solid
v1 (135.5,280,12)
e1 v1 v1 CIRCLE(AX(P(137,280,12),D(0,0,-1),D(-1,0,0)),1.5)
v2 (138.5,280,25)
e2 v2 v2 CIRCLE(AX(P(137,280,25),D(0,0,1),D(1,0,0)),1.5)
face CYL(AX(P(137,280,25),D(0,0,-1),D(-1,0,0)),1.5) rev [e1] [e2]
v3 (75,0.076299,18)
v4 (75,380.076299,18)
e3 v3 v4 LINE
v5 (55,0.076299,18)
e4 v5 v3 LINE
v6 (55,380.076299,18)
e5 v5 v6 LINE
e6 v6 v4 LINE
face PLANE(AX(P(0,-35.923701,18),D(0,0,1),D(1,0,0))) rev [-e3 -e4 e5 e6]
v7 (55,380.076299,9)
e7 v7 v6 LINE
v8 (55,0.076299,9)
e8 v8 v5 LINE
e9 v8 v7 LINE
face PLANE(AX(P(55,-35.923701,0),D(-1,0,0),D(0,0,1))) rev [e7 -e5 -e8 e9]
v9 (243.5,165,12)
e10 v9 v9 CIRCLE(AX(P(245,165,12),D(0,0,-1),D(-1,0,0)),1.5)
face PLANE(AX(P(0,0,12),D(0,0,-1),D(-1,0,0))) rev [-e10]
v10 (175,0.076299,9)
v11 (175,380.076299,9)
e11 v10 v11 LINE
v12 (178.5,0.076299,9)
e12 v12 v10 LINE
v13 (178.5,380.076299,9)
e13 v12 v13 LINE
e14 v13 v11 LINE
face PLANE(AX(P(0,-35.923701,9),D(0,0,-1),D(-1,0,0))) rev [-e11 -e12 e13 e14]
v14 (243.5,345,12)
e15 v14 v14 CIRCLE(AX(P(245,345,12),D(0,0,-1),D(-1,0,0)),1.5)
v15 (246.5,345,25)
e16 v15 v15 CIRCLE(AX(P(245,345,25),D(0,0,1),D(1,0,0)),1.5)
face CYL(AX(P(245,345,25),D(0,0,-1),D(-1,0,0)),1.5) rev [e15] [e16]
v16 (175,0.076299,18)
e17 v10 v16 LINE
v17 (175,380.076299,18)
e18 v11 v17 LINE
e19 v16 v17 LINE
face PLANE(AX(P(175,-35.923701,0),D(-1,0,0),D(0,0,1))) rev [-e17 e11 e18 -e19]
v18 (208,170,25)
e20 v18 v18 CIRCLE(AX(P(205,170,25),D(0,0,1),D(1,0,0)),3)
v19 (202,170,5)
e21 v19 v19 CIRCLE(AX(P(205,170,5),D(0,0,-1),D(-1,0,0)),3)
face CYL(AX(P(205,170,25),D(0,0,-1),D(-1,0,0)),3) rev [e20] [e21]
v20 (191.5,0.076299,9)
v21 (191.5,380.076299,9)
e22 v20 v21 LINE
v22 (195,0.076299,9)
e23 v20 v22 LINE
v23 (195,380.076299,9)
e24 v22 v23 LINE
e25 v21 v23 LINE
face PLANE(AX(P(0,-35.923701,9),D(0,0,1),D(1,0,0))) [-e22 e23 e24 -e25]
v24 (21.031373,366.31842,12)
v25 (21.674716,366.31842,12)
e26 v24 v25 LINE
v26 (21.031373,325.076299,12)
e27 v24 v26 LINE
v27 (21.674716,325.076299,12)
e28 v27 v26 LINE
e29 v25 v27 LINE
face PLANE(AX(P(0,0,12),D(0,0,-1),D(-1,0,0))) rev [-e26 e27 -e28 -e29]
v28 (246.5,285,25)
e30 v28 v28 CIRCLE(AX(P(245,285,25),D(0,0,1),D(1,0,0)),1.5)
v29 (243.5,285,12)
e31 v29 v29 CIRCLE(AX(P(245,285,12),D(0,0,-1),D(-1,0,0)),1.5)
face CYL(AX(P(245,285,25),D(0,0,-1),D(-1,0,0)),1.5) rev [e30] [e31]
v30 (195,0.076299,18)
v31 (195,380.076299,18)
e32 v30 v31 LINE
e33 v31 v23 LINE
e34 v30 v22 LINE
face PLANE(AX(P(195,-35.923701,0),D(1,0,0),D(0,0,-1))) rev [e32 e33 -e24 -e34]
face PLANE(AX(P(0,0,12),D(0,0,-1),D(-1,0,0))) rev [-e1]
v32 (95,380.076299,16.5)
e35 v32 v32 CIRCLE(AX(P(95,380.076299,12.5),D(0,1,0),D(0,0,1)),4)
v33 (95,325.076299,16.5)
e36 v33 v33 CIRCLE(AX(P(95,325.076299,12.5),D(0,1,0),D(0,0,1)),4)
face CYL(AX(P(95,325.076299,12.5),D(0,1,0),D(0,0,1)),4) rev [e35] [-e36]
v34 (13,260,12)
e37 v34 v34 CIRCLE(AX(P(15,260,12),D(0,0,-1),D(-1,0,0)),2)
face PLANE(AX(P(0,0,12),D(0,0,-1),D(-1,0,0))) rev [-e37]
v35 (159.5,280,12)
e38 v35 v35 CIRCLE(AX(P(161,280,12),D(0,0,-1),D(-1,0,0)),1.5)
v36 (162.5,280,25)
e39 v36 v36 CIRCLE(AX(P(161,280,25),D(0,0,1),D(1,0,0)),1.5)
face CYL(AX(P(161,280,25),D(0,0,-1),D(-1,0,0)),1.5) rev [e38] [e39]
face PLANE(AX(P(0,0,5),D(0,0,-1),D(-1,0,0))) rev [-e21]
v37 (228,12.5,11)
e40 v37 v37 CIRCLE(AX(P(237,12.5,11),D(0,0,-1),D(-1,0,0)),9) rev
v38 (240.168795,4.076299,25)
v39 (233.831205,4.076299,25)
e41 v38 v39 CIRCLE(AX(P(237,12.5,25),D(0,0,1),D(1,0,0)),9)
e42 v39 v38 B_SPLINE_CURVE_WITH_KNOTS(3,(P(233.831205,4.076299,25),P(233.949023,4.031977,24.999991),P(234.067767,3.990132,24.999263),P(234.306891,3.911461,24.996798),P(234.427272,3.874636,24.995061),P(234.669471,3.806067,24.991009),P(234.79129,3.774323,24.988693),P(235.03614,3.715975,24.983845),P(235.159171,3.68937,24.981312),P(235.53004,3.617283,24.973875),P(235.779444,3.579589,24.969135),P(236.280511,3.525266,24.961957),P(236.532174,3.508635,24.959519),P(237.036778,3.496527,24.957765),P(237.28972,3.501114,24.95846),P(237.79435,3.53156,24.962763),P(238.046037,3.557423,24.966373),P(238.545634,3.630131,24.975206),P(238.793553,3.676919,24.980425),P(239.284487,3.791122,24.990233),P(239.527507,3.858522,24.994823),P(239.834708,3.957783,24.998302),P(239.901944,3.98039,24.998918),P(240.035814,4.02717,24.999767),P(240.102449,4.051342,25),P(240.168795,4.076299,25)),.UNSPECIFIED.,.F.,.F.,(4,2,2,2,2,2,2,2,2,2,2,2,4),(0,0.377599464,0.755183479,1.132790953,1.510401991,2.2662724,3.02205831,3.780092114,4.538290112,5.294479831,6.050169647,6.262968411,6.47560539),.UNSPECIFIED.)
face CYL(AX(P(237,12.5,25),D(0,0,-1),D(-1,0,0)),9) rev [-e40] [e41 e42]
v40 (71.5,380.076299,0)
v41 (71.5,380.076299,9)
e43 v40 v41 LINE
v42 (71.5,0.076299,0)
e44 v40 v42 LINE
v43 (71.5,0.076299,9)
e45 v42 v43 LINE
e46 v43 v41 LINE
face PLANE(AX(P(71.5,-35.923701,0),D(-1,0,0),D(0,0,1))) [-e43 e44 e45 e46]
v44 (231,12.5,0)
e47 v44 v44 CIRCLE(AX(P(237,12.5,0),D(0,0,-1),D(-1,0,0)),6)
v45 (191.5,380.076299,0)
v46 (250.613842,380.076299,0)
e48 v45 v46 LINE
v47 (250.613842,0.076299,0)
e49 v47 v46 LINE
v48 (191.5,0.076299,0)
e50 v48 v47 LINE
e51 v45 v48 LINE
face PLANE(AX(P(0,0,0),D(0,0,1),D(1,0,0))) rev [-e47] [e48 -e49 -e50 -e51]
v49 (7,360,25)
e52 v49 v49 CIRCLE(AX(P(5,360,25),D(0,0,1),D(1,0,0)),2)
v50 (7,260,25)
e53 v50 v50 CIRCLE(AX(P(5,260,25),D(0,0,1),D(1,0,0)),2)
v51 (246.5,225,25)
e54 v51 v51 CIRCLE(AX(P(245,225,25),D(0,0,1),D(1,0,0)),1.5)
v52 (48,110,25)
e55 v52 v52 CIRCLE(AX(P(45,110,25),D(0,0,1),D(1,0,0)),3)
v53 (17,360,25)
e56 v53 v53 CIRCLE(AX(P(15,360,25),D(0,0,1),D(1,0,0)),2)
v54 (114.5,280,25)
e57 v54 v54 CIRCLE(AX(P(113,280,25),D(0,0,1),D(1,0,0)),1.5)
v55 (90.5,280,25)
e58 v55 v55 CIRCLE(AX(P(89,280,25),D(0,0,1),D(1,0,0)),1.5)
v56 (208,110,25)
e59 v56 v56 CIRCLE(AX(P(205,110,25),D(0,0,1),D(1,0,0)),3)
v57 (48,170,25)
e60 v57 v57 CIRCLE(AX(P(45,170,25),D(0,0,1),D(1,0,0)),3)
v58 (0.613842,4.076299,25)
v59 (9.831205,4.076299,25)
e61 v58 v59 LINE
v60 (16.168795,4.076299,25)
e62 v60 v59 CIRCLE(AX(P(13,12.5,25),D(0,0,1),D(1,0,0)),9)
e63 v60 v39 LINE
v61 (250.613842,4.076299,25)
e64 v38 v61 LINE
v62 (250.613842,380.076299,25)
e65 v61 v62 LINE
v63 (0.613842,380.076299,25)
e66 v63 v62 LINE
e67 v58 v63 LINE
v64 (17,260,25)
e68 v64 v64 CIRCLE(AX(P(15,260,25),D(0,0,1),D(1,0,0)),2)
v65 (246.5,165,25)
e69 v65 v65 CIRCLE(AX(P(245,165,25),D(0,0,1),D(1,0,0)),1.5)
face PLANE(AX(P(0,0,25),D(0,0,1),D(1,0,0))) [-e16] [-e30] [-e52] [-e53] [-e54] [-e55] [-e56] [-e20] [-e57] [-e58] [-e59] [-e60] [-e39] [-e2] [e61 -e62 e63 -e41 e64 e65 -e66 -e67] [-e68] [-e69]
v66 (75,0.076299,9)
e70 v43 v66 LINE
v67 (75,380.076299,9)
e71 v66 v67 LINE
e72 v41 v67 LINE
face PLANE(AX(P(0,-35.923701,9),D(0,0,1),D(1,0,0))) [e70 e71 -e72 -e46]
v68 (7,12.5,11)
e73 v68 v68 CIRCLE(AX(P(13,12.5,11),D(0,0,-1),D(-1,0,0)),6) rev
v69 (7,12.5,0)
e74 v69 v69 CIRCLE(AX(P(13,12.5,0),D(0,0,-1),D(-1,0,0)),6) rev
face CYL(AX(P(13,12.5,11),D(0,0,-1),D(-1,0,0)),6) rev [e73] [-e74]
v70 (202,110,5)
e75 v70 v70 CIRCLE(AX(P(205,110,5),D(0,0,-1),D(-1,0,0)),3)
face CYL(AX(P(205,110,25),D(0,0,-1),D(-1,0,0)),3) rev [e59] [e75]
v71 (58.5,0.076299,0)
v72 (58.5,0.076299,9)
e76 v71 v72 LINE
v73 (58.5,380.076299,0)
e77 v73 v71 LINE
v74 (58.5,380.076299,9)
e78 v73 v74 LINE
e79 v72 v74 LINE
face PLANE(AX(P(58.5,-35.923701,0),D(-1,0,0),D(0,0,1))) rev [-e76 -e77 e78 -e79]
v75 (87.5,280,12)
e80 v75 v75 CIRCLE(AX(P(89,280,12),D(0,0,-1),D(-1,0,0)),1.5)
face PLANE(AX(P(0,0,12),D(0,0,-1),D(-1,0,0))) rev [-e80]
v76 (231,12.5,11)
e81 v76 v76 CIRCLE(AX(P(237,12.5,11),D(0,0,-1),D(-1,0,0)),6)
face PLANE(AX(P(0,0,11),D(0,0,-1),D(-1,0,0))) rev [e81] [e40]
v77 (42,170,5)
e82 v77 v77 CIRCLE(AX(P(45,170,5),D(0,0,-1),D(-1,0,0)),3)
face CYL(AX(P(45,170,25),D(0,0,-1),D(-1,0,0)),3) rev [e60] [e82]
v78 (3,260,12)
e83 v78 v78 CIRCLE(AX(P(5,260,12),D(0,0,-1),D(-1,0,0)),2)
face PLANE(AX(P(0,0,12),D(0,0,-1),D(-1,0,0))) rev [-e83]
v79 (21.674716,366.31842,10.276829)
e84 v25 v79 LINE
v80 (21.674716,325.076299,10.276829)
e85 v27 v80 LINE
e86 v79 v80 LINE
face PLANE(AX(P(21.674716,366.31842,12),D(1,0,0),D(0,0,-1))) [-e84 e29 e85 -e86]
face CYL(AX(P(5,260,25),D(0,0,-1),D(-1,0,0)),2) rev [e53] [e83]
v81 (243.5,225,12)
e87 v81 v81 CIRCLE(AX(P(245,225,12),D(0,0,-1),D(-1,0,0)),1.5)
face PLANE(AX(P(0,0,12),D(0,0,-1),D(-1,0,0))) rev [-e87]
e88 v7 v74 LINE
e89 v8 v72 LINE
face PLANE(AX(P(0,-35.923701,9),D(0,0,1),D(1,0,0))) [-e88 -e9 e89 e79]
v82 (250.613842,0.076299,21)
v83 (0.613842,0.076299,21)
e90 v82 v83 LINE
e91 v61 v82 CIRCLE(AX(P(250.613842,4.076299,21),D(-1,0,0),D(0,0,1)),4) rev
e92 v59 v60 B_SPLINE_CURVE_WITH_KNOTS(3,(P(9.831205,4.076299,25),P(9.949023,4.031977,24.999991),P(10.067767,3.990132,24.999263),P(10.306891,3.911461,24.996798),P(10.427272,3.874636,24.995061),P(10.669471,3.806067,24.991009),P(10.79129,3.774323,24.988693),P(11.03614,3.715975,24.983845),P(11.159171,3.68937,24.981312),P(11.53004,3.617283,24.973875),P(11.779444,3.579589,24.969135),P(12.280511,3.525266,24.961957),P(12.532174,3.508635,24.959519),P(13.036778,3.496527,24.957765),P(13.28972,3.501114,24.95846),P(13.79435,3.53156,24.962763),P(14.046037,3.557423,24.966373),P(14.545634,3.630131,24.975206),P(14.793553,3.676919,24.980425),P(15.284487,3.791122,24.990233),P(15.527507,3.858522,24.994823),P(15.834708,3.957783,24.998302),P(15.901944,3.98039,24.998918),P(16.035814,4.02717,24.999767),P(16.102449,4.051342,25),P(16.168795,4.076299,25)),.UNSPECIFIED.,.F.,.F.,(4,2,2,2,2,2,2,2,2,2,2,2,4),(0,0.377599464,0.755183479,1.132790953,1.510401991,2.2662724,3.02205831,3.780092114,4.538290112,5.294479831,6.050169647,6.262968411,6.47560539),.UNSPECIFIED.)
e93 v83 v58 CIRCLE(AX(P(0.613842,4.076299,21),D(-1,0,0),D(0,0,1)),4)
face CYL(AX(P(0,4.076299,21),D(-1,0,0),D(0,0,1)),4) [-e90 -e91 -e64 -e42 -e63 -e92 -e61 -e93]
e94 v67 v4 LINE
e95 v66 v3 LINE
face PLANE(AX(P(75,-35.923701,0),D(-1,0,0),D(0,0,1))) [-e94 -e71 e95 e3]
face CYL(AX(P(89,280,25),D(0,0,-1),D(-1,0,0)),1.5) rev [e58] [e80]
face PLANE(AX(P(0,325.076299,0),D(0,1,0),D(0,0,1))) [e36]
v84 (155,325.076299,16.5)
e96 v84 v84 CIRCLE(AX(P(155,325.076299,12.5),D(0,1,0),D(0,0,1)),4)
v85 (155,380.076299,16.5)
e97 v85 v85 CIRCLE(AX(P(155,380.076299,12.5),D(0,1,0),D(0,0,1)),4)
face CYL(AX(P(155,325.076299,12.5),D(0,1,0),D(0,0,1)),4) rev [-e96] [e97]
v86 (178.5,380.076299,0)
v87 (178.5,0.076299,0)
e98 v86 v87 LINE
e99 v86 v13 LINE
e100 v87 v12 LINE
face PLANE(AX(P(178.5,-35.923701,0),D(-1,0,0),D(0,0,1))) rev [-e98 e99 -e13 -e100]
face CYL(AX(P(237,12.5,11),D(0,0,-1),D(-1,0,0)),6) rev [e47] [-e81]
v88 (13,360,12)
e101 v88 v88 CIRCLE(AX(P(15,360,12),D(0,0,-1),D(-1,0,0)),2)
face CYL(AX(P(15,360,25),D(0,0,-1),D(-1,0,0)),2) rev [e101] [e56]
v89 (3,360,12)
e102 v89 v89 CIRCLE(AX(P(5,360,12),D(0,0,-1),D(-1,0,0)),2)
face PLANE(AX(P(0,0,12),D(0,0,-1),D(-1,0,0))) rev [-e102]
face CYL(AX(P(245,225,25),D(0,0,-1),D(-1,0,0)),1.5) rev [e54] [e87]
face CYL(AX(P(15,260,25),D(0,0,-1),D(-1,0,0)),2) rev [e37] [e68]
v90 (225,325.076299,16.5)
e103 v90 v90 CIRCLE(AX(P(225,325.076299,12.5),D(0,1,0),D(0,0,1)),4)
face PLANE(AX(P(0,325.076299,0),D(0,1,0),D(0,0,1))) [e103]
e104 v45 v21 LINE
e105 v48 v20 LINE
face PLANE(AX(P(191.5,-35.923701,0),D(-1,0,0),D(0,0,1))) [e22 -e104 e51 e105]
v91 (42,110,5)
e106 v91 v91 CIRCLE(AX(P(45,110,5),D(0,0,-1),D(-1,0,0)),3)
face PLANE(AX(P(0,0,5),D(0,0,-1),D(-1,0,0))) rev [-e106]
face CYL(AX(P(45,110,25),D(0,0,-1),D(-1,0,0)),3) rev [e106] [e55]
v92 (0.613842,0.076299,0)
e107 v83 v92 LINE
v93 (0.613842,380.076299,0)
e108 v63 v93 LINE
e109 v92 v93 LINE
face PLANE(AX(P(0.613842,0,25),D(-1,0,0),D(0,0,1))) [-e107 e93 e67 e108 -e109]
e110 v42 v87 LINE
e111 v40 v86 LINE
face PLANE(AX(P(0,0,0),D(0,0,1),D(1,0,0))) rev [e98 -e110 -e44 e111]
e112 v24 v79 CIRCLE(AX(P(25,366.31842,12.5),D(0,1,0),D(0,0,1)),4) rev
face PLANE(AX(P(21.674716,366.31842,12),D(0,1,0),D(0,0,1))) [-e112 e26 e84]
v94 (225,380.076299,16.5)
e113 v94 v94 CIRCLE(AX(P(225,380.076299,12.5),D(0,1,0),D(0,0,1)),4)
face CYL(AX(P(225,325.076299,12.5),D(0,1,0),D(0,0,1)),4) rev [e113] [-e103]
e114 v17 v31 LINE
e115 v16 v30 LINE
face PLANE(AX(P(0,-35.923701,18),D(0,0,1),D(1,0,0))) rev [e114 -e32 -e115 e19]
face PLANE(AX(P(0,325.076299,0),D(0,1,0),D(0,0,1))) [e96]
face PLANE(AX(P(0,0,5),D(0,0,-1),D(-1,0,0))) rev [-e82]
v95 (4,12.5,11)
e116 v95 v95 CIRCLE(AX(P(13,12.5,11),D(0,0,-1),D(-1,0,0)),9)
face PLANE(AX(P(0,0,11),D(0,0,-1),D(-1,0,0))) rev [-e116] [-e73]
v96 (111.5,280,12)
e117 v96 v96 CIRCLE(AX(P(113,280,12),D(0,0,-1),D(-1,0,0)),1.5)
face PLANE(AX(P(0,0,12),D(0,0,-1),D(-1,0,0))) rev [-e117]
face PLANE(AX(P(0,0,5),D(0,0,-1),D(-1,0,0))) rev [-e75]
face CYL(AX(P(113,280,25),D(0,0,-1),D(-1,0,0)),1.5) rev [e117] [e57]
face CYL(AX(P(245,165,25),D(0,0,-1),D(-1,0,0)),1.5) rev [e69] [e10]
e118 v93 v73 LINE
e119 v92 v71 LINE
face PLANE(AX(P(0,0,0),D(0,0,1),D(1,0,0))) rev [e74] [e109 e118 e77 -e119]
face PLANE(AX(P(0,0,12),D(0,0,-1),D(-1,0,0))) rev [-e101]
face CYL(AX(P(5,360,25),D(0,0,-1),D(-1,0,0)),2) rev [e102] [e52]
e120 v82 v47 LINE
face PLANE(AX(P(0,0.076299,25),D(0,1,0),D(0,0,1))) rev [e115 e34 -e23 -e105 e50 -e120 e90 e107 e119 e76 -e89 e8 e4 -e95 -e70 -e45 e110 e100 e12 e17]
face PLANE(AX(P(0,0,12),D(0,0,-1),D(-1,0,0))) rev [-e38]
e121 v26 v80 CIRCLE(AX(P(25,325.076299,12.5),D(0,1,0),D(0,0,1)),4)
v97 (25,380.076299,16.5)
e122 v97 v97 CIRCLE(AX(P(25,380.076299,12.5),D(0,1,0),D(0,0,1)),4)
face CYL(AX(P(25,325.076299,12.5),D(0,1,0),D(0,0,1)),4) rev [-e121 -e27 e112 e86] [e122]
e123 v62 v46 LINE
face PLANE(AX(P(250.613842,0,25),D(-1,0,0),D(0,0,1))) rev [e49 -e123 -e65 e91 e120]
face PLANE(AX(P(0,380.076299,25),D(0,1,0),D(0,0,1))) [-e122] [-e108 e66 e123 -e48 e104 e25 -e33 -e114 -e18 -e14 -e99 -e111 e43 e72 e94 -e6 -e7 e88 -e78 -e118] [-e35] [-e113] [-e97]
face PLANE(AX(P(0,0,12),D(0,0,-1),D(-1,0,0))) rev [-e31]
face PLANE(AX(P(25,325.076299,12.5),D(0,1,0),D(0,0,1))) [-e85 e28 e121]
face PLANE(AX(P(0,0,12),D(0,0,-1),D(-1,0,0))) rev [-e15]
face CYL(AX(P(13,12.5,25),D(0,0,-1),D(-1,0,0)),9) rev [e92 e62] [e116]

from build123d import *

# Parameters (mm, degrees)
SKETCH_1_W          = 250
SKETCH_1_H          = 380
SKETCH_1_R          = 9
SKETCH_1_R_2        = 2
SKETCH_1_R_3        = 1.5
SKETCH_1_R_4        = 3
EXTRUDE_3_DEPTH     = 25
CUT_EXTRUDE_1_DEPTH = 416
SKETCH_3_4_R        = 4
CUT_EXTRUDE_2_DEPTH = 55
SKETCH_5_W          = 76.418543054
SKETCH_5_H          = 18.162254628
EXTRUDE_4_DEPTH     = 12
SKETCH_6_W          = 9.937837438
SKETCH_6_H          = 197.728696601
EXTRUDE_5_DEPTH     = 12
SKETCH_7_W          = 21.060874429
SKETCH_7_H          = 111.734651623
EXTRUDE_6_DEPTH     = 12
SKETCH_8_W          = 15.76346628
SKETCH_8_H          = 76.418543054
EXTRUDE_7_DEPTH     = 5
SKETCH_9_W          = 10.965889587
SKETCH_9_H          = 75.390490905
EXTRUDE_8_DEPTH     = 5
SKETCH_10_W         = 21.30480461
SKETCH_10_H         = 26.996927979
SKETCH_10_R         = 6
EXTRUDE_11_DEPTH    = 11
FILLET_1_R          = 4


with BuildPart() as part:
    # 草图1 → 凸台-拉伸3 (new body)
    with BuildSketch(Plane.XY):
        with Locations((125.613842041, 190.076299127)):
            Rectangle(SKETCH_1_W, SKETCH_1_H)
        with Locations((13, 12.5)):
            Circle(SKETCH_1_R, mode=Mode.SUBTRACT)
        with Locations((237, 12.5)):
            Circle(SKETCH_1_R, mode=Mode.SUBTRACT)
        with Locations((5, 360)):
            Circle(SKETCH_1_R_2, mode=Mode.SUBTRACT)
        with Locations((5, 260)):
            Circle(SKETCH_1_R_2, mode=Mode.SUBTRACT)
        with Locations((15, 360)):
            Circle(SKETCH_1_R_2, mode=Mode.SUBTRACT)
        with Locations((15, 260)):
            Circle(SKETCH_1_R_2, mode=Mode.SUBTRACT)
        with Locations((89, 280)):
            Circle(SKETCH_1_R_3, mode=Mode.SUBTRACT)
        with Locations((113, 280)):
            Circle(SKETCH_1_R_3, mode=Mode.SUBTRACT)
        with Locations((137, 280)):
            Circle(SKETCH_1_R_3, mode=Mode.SUBTRACT)
        with Locations((161, 280)):
            Circle(SKETCH_1_R_3, mode=Mode.SUBTRACT)
        with Locations((45, 110)):
            Circle(SKETCH_1_R_4, mode=Mode.SUBTRACT)
        with Locations((45, 170)):
            Circle(SKETCH_1_R_4, mode=Mode.SUBTRACT)
        with Locations((205, 170)):
            Circle(SKETCH_1_R_4, mode=Mode.SUBTRACT)
        with Locations((205, 110)):
            Circle(SKETCH_1_R_4, mode=Mode.SUBTRACT)
        with Locations((245, 345)):
            Circle(SKETCH_1_R_3, mode=Mode.SUBTRACT)
        with Locations((245, 285)):
            Circle(SKETCH_1_R_3, mode=Mode.SUBTRACT)
        with Locations((245, 225)):
            Circle(SKETCH_1_R_3, mode=Mode.SUBTRACT)
        with Locations((245, 165)):
            Circle(SKETCH_1_R_3, mode=Mode.SUBTRACT)
    extrude(amount=EXTRUDE_3_DEPTH)

    # 草图3 → 切除-拉伸1 (cut)
    with BuildSketch(Plane(origin=(0, 380.076299127, 0), x_dir=(1, 0, 0), z_dir=(0, 1, 0))):
        Polygon((71.5, -9), (71.5, 0), (58.5, 0), (58.5, -9), (55, -9), (55, -18), (75, -18), (75, -9), align=None)
        Polygon((191.5, 0), (178.5, 0), (178.5, -9), (175, -9), (175, -18), (195, -18), (195, -9), (191.5, -9), align=None)
    extrude(amount=-CUT_EXTRUDE_1_DEPTH, mode=Mode.SUBTRACT)

    # 草图3<4> → 切除-拉伸2 (cut)
    with BuildSketch(Plane(origin=(0, 380.076299127, 0), x_dir=(1, 0, 0), z_dir=(0, 1, 0))):
        with Locations(Location((95, -12.5, 0), (0, 0, 270))):
            Circle(SKETCH_3_4_R)
        with Locations(Location((155, -12.5, 0), (0, 0, 270))):
            Circle(SKETCH_3_4_R)
        with Locations(Location((225, -12.5, 0), (0, 0, 270))):
            Circle(SKETCH_3_4_R)
        with Locations(Location((25, -12.5, 0), (0, 0, 270))):
            Circle(SKETCH_3_4_R)
    extrude(amount=-CUT_EXTRUDE_2_DEPTH, mode=Mode.SUBTRACT)

    # 草图5 → 凸台-拉伸4 (add)
    with BuildSketch(Plane(origin=(0, 0, 0), x_dir=(-1, 0, 0), z_dir=(0, 0, -1))):
        with Locations((-124.414447867, 279.859520114)):
            Rectangle(SKETCH_5_W, SKETCH_5_H)
    extrude(amount=-EXTRUDE_4_DEPTH)

    # 草图6 → 凸台-拉伸5 (add)
    with BuildSketch(Plane(origin=(0, 0, 0), x_dir=(-1, 0, 0), z_dir=(0, 0, -1))):
        with Locations((-244.34867248, 253.130164248)):
            Rectangle(SKETCH_6_W, SKETCH_6_H)
    extrude(amount=-EXTRUDE_5_DEPTH)

    # 草图7 → 凸台-拉伸6 (add)
    with BuildSketch(Plane(origin=(0, 0, 0), x_dir=(-1, 0, 0), z_dir=(0, 0, -1))):
        with Locations((-11.144279256, 310.45109449)):
            Rectangle(SKETCH_7_W, SKETCH_7_H)
    extrude(amount=-EXTRUDE_6_DEPTH)

    # 草图8 → 凸台-拉伸7 (add)
    with BuildSketch(Plane(origin=(0, 0, 0), x_dir=(-1, 0, 0), z_dir=(0, 0, -1))):
        with Locations((-204.431173441, 138.673691692)):
            Rectangle(SKETCH_8_W, SKETCH_8_H)
    extrude(amount=-EXTRUDE_7_DEPTH)

    # 草图9 → 凸台-拉伸8 (add)
    with BuildSketch(Plane(origin=(0, 0, 0), x_dir=(-1, 0, 0), z_dir=(0, 0, -1))):
        with Locations((-45.425774442, 139.530401815)):
            Rectangle(SKETCH_9_W, SKETCH_9_H)
    extrude(amount=-EXTRUDE_8_DEPTH)

    # 草图10 → 凸台-拉伸11 (add)
    # profile 1 of 2: a face of its own
    with BuildSketch(Plane(origin=(0, 0, 0), x_dir=(-1, 0, 0), z_dir=(0, 0, -1))):
        with Locations((-236.946967286, 15.123600302)):
            Rectangle(SKETCH_10_W, SKETCH_10_H)
        with Locations((-237, 12.5)):
            Circle(SKETCH_10_R, mode=Mode.SUBTRACT)
    # profile 2 of 2: a face of its own
    with BuildSketch(Plane(origin=(0, 0, 0), x_dir=(-1, 0, 0), z_dir=(0, 0, -1))):
        with Locations((-13.053032714, 15.123600302)):
            Rectangle(SKETCH_10_W, SKETCH_10_H)
        with Locations((-13, 12.5)):
            Circle(SKETCH_10_R, mode=Mode.SUBTRACT)
    extrude(amount=-EXTRUDE_11_DEPTH)

    # 圆角1
    # the kernel refuses this fillet: 4 mm, written as the material it takes off along each edge
    with BuildSketch(Plane(origin=(-9.386157959, 0.076299127, 25), x_dir=(0, 0, -1), z_dir=(1, 0, 0))) as fillet_1_piece_1:
        with BuildLine():
            CenterArc((FILLET_1_R, FILLET_1_R), FILLET_1_R, 180, 90)
            Line((0, FILLET_1_R), (0, 0))
            Line((0, 0), (FILLET_1_R, 0))
        make_face()
    extrude(amount=270, mode=Mode.SUBTRACT)


solid = part.part
